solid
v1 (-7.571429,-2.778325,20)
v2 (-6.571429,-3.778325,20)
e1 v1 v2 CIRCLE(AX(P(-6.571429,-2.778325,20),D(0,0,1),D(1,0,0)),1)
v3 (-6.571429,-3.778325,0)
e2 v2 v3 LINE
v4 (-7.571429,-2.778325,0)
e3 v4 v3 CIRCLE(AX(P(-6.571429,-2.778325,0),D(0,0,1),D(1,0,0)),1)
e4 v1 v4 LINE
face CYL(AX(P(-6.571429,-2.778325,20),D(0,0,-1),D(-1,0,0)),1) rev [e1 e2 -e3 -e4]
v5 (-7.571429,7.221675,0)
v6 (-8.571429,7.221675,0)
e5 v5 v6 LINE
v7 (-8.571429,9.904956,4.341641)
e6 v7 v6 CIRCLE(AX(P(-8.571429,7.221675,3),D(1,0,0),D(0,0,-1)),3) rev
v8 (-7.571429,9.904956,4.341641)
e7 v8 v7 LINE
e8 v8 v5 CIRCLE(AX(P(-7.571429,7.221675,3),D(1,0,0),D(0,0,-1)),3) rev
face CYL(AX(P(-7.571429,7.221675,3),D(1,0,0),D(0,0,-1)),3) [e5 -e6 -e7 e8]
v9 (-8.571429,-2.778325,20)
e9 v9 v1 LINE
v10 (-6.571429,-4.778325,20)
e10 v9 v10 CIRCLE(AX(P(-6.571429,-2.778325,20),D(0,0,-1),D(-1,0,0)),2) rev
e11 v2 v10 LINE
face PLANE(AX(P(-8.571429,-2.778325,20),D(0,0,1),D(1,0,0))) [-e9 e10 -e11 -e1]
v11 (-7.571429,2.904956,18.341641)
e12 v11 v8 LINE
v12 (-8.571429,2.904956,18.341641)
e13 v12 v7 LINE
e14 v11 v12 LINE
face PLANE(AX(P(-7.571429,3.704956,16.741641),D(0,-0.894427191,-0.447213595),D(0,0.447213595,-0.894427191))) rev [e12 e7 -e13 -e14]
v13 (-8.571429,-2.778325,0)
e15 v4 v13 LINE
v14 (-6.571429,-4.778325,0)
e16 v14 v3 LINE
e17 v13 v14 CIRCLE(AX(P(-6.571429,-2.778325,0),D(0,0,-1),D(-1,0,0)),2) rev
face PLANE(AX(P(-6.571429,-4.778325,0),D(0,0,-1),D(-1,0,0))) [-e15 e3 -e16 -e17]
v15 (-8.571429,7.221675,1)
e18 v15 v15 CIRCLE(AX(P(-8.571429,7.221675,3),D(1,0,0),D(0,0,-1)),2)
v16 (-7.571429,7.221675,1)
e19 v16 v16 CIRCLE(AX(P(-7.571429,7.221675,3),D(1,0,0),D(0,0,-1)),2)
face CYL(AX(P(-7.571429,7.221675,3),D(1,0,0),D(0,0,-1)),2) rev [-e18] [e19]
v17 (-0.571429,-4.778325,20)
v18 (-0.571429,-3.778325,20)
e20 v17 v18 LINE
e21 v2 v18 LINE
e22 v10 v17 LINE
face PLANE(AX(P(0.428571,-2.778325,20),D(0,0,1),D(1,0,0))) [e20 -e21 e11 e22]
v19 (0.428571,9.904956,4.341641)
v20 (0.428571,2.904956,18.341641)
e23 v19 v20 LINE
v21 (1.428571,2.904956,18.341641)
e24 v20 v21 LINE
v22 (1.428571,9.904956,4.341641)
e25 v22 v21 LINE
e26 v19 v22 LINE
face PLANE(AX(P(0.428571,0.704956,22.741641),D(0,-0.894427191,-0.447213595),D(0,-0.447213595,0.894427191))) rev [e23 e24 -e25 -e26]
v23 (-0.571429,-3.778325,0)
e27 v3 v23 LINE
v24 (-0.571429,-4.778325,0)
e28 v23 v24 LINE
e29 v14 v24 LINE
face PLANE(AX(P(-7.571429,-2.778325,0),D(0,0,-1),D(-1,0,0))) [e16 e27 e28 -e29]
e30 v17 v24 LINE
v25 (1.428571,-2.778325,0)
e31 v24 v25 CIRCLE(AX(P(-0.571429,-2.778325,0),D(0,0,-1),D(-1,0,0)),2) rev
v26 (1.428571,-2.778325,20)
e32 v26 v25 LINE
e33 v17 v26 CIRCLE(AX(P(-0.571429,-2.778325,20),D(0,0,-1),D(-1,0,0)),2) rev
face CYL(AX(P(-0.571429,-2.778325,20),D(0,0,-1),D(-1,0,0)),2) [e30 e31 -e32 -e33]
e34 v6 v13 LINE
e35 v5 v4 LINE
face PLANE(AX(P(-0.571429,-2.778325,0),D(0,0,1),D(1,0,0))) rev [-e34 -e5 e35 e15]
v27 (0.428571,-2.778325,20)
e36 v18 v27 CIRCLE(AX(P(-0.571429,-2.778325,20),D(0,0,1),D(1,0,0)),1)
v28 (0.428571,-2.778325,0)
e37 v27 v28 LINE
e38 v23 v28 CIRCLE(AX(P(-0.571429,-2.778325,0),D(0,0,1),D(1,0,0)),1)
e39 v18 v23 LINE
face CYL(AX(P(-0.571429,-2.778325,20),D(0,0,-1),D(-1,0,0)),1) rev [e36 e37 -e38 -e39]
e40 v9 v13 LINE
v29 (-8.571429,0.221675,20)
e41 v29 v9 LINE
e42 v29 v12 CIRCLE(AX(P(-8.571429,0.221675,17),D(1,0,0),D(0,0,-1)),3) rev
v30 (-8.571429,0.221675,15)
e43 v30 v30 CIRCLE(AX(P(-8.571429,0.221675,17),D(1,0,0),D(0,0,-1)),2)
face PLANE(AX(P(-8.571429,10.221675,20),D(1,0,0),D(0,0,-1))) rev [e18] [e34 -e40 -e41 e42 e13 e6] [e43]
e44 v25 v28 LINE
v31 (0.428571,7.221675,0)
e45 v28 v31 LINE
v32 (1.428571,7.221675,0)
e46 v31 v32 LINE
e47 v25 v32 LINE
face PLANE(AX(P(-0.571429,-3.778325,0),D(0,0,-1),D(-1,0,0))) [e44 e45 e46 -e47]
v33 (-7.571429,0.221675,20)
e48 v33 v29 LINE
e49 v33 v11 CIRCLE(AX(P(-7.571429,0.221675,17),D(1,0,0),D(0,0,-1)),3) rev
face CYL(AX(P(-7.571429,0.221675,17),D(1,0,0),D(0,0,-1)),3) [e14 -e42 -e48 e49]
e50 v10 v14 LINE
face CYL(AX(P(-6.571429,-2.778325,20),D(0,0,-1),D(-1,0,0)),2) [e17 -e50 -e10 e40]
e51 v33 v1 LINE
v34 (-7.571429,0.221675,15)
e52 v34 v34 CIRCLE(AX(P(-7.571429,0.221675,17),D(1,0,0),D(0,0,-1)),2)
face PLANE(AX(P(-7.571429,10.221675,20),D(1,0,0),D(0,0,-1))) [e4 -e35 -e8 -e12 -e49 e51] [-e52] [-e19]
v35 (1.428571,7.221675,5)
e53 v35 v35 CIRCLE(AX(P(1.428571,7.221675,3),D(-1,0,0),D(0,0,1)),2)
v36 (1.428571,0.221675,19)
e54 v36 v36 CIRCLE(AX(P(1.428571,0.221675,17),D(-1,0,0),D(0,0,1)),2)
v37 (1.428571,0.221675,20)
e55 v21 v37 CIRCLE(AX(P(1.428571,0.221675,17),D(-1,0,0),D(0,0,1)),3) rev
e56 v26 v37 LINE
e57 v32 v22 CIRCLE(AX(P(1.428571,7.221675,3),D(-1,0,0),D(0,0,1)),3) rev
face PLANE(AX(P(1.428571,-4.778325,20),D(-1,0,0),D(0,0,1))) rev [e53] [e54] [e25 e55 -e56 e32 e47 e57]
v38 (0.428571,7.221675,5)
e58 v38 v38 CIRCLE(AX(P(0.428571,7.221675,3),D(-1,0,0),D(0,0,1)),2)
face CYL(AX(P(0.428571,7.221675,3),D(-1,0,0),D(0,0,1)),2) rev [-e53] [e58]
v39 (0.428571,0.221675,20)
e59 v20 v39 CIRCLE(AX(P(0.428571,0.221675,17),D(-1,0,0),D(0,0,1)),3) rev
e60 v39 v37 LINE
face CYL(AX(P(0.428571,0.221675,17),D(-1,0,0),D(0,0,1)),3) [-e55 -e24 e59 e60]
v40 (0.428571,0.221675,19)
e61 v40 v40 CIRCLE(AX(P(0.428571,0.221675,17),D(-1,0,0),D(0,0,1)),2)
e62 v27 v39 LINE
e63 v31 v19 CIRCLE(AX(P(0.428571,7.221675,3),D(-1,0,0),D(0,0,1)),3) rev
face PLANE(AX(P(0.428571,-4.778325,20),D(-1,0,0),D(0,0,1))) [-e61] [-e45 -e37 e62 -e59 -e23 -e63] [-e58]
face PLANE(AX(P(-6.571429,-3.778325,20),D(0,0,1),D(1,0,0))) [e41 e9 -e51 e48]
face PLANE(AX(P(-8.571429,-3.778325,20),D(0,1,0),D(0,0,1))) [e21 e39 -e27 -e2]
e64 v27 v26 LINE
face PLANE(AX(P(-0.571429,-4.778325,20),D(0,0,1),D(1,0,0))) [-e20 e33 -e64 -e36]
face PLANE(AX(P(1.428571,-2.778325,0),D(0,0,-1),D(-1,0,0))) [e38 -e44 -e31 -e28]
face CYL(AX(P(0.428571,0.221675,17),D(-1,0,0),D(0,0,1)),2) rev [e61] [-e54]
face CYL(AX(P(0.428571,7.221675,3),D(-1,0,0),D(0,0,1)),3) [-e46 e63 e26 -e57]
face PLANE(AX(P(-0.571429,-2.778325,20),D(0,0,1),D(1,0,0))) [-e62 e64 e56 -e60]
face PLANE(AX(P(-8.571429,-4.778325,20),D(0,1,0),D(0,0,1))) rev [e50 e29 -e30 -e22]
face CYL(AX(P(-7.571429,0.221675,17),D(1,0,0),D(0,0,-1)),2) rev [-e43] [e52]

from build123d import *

# Parameters (mm, degrees)
T_LE_DE_BASE_PLI_E1_DEPTH = 20
ESQUISSE7_R               = 2
ENL_V_MAT_EXTRU_1_DEPTH   = 25.586228611
ENL_V_MAT_EXTRU_2_DEPTH   = 25.586228611


# Sheet-metal steps are written as plain solids
with BuildPart() as part:
    # Esquisse2 → Tôle de base pliée1 (new body)
    with BuildSketch(Plane.XY):
        with BuildLine():
            Line((-8.571428571, 10.221674877), (-8.571428571, -2.778325123))
            ThreePointArc((-8.571428571, -2.778325123), (-7.985642134, -4.192538686), (-6.571428571, -4.778325123))
            Line((-6.571428571, -4.778325123), (-0.571428571, -4.778325123))
            ThreePointArc((-0.571428571, -4.778325123), (0.842784991, -4.192538686), (1.428571429, -2.778325123))
            Line((1.428571429, -2.778325123), (1.428571429, 10.221674877))
            Line((1.428571429, 10.221674877), (0.428571429, 10.221674877))
            Line((0.428571429, 10.221674877), (0.428571429, -2.778325123))
            ThreePointArc((0.428571429, -2.778325123), (0.13567821, -3.485431904), (-0.571428571, -3.778325123))
            Line((-0.571428571, -3.778325123), (-6.571428571, -3.778325123))
            ThreePointArc((-6.571428571, -3.778325123), (-7.278535353, -3.485431904), (-7.571428571, -2.778325123))
            Line((-7.571428571, -2.778325123), (-7.571428571, 10.221674877))
            Line((-7.571428571, 10.221674877), (-8.571428571, 10.221674877))
        make_face()
    extrude(amount=T_LE_DE_BASE_PLI_E1_DEPTH)

    # Esquisse7 → Enlèv. mat.-Extru.1 (cut, through all)
    with BuildSketch(Plane(origin=(1.428571429, 0, 0), x_dir=(0, 0, -1), z_dir=(1, 0, 0))):
        with Locations(Location((-3, 7.221674877, 0), (0, 0, 180))):
            Circle(ESQUISSE7_R)
        with Locations((-17, 0.221674877)):
            Circle(ESQUISSE7_R)
        with BuildLine():
            Line((-18.341640786, 2.90495645), (-4.341640786, 9.90495645))
            ThreePointArc((-4.341640786, 9.90495645), (-3.689258762, 10.141421845), (-3, 10.221674877))
            Line((-3, 10.221674877), (-20, 10.221674877))
            Line((-20, 10.221674877), (-20, 0.221674877))
            ThreePointArc((-20, 0.221674877), (-19.551952425, 1.798868213), (-18.341640786, 2.90495645))
        make_face()
    extrude(amount=-ENL_V_MAT_EXTRU_1_DEPTH, mode=Mode.SUBTRACT)

    # Esquisse9 → Enlèv. mat.-Extru.2 (cut, through all)
    with BuildSketch(Plane(origin=(1.428571429, 0, 0), x_dir=(0, 0, -1), z_dir=(1, 0, 0))):
        with BuildLine():
            Line((-3, 10.221674877), (0, 10.221674877))
            Line((0, 10.221674877), (0, 7.221674877))
            ThreePointArc((0, 7.221674877), (-0.878679656, 9.34299522), (-3, 10.221674877))
        make_face()
    extrude(amount=-ENL_V_MAT_EXTRU_2_DEPTH, mode=Mode.SUBTRACT)


solid = part.part
